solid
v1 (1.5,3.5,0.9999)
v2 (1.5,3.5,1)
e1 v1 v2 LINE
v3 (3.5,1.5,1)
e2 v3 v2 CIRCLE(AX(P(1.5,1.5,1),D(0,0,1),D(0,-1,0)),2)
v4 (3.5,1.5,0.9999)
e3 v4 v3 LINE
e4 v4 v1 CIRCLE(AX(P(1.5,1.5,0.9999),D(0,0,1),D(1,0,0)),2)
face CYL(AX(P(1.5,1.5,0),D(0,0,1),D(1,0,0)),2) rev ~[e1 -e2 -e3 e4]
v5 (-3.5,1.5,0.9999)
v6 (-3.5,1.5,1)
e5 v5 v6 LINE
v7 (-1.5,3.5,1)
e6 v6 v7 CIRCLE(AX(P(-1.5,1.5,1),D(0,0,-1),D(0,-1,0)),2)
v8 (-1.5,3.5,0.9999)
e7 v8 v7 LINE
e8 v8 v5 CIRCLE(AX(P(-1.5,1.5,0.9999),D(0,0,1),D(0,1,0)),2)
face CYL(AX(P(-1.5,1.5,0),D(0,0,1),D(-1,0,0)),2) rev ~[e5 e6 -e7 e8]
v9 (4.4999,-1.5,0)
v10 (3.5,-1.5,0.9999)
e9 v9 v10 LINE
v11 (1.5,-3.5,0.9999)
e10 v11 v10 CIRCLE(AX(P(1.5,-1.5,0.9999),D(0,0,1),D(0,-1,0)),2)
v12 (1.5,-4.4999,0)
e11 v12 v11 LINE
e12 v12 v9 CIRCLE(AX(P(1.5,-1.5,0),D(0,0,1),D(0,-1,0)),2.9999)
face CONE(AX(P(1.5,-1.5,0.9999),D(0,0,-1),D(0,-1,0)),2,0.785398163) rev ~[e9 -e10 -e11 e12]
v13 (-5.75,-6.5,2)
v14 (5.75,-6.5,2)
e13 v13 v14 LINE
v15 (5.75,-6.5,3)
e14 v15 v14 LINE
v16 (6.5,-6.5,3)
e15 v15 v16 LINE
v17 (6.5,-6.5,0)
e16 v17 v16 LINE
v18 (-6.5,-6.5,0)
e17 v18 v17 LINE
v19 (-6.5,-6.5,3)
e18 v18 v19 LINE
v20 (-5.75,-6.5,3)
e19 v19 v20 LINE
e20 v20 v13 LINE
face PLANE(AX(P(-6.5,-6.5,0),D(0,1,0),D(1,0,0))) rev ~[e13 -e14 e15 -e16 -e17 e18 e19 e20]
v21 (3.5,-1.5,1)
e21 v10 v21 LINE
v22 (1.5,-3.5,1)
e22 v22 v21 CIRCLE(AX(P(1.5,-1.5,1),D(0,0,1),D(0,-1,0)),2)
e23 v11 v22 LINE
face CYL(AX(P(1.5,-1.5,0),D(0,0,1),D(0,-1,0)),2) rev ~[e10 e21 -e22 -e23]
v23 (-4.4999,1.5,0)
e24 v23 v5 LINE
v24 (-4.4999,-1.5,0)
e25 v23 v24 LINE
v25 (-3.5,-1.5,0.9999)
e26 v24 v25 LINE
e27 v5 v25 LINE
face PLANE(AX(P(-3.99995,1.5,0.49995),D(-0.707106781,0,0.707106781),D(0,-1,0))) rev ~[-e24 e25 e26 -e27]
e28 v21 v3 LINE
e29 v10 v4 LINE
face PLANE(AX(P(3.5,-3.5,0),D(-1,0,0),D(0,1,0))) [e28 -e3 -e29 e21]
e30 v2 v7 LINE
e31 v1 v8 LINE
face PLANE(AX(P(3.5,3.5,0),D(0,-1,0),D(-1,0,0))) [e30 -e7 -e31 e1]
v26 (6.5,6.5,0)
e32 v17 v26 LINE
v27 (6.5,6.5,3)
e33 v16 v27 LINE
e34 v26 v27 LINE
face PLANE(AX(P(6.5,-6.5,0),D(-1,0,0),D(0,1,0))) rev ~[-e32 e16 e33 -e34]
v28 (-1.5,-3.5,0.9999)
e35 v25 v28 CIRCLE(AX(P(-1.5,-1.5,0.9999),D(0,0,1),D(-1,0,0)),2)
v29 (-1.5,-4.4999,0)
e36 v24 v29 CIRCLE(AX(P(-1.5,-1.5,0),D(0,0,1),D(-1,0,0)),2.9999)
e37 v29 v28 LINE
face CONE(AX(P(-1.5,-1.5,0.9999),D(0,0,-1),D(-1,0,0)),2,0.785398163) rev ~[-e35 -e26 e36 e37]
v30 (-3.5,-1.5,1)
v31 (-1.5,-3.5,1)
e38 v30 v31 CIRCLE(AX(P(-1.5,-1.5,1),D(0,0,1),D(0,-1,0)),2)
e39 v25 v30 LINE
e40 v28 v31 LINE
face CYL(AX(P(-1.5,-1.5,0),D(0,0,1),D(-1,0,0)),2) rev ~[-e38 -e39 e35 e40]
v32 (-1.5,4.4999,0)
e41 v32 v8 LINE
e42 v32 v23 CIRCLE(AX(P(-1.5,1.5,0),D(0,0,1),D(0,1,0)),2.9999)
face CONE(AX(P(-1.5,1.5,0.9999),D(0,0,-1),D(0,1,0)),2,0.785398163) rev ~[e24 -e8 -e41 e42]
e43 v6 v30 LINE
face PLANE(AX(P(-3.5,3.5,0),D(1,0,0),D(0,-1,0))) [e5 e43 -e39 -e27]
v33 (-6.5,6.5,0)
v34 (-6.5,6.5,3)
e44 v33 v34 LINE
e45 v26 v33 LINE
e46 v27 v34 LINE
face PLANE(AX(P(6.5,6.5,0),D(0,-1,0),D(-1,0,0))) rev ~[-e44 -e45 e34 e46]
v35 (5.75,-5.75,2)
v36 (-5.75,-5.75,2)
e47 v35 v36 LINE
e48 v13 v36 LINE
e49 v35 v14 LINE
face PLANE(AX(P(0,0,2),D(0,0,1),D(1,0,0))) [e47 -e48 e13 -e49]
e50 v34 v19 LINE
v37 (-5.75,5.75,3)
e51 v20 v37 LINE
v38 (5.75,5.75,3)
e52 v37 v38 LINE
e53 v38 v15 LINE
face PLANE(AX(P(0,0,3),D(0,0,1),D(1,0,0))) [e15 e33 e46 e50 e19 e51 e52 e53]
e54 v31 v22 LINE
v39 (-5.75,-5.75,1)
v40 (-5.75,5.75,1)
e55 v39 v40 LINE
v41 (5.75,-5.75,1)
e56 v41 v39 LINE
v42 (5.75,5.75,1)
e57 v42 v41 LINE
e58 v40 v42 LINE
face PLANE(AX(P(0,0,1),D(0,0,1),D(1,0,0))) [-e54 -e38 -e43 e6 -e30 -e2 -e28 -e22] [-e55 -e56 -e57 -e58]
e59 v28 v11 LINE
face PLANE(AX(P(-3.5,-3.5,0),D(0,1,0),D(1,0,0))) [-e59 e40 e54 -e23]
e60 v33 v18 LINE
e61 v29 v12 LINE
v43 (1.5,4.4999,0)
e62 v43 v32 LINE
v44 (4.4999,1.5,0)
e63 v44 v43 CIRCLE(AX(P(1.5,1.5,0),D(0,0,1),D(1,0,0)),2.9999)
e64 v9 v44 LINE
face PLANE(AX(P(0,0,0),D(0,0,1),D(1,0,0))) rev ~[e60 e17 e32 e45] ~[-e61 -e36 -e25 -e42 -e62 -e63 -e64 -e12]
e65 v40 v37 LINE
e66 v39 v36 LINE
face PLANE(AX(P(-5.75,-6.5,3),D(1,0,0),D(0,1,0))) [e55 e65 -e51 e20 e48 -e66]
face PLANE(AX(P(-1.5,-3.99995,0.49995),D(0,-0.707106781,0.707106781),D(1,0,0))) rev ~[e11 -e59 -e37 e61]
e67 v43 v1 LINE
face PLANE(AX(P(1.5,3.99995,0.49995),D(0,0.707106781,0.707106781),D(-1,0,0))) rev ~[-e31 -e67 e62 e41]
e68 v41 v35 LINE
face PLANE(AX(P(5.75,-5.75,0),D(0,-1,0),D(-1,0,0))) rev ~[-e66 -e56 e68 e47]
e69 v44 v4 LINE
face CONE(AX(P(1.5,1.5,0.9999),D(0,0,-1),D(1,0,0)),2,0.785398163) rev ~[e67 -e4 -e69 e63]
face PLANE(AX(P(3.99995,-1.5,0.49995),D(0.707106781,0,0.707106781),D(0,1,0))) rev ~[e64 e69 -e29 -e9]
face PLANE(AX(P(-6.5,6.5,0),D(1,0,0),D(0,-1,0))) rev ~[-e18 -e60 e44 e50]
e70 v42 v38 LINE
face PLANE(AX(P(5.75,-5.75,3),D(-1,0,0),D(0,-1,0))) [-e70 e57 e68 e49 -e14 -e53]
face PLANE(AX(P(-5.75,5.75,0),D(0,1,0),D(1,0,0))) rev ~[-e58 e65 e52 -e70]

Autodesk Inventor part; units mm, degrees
ref_plane "YZ Plane" through (0, 0, 0) normal (1, 0, 0) x (0, 1, 0)
ref_plane "XZ Plane" through (0, 0, 0) normal (0, 1, 0) x (-1, 0, 0)
ref_plane "XY Plane" through (0, 0, 0) normal (0, 0, 1) x (1, 0, 0)
sketch "Sketch2" plane through (0, 0, 0) normal (0, 0, 1) x (1, 0, 0)
  line L0 (-6.5, -6.5) -> (6.5, -6.5)
  line L1 (6.5, -6.5) -> (6.5, 6.5)
  line L2 (6.5, 6.5) -> (-6.5, 6.5)
  line L3 (-6.5, 6.5) -> (-6.5, -6.5)
  line L4 (-6.5, -6.5) -> (6.5, 6.5) construction
  line L5 (6.5, -6.5) -> (-6.5, 6.5) construction
  line L6 (-5.25, -5.25) -> (5.25, -5.25)
  line L7 (5.25, -5.25) -> (5.25, 5.25)
  line L8 (5.25, 5.25) -> (-5.25, 5.25)
  line L9 (-5.25, 5.25) -> (-5.25, -5.25)
  line L10 (-5.25, -5.25) -> (5.25, 5.25) construction
  line L11 (5.25, -5.25) -> (-5.25, 5.25) construction
  line L12 (-5.75, 5.75) -> (5.75, 5.75)
  line L13 (5.75, 5.75) -> (5.75, -5.75)
  line L14 (5.75, -5.75) -> (-5.75, -5.75)
  line L15 (-5.75, -5.75) -> (-5.75, 5.75)
  line L16 (-3.5, -3.5) -> (3.5, -3.5)
  line L17 (3.5, -3.5) -> (3.5, 3.5)
  line L18 (3.5, 3.5) -> (-3.5, 3.5)
  line L19 (-3.5, 3.5) -> (-3.5, -3.5)
  line L20 (-3.5, -3.5) -> (3.5, 3.5) construction
  line L21 (3.5, -3.5) -> (-3.5, 3.5) construction
  point P0 (0, 0)
  dimension "d0" = 13
  dimension "d1" = 13
  dimension "d2" = 10.5
  dimension "d3" = 10.5
  dimension "d4" = 0.5
  dimension "d5" = 7
  dimension "d6" = 7
extrude "Extrusion1" add sketch "Sketch2" along normal blind 3 contours L3 L2 L1 L0
extrude "Extrusion2" add sketch "Sketch2" along normal blind 1 contours L9 L8 L7 L6 | L12 L13 L14 L15 | L19 L18 L17 L16
extrude "Extrusion3" cut sketch "Sketch2" along normal blind 1 contours L19 L18 L17 L16
fillet "Fillet1" radius 2 4 edges at (-3.5, 3.5, 0.5) (-3.5, -3.5, 0.5) (3.5, 3.5, 0.5) (3.5, -3.5, 0.5)
chamfer "Chamfer1" distance 1 angle 45 8 edges at (0, 3.5, 0) (-2.9142, 2.9142, 0) (-3.5, 0, 0) (-2.9142, -2.9142, 0) (0, -3.5, 0) (2.9142, -2.9142, 0) (3.5, 0, 0) (2.9142, 2.9142, 0)
sketch "Sketch3" plane through (0, 0, 3) normal (0, 0, 1) x (1, 0, 0)
  line L0 (5.75, -5.75) -> (-5.75, -5.75) projected
  line L1 (-6.5, -6.5) -> (6.5, -6.5) projected
  line L2 (-5.75, -5.75) -> (5.75, -5.75)
  line L3 (5.75, -5.75) -> (5.75, -6.5)
  line L4 (5.75, -6.5) -> (-5.75, -6.5)
  line L5 (-5.75, -6.5) -> (-5.75, -5.75)
  point P0 (0, 0)
  dimension "d17" = 11.5
extrude "Extrusion4" cut sketch "Sketch3" against normal blind 1
properties part number "Optical module_lid" material "PET Plastic"
